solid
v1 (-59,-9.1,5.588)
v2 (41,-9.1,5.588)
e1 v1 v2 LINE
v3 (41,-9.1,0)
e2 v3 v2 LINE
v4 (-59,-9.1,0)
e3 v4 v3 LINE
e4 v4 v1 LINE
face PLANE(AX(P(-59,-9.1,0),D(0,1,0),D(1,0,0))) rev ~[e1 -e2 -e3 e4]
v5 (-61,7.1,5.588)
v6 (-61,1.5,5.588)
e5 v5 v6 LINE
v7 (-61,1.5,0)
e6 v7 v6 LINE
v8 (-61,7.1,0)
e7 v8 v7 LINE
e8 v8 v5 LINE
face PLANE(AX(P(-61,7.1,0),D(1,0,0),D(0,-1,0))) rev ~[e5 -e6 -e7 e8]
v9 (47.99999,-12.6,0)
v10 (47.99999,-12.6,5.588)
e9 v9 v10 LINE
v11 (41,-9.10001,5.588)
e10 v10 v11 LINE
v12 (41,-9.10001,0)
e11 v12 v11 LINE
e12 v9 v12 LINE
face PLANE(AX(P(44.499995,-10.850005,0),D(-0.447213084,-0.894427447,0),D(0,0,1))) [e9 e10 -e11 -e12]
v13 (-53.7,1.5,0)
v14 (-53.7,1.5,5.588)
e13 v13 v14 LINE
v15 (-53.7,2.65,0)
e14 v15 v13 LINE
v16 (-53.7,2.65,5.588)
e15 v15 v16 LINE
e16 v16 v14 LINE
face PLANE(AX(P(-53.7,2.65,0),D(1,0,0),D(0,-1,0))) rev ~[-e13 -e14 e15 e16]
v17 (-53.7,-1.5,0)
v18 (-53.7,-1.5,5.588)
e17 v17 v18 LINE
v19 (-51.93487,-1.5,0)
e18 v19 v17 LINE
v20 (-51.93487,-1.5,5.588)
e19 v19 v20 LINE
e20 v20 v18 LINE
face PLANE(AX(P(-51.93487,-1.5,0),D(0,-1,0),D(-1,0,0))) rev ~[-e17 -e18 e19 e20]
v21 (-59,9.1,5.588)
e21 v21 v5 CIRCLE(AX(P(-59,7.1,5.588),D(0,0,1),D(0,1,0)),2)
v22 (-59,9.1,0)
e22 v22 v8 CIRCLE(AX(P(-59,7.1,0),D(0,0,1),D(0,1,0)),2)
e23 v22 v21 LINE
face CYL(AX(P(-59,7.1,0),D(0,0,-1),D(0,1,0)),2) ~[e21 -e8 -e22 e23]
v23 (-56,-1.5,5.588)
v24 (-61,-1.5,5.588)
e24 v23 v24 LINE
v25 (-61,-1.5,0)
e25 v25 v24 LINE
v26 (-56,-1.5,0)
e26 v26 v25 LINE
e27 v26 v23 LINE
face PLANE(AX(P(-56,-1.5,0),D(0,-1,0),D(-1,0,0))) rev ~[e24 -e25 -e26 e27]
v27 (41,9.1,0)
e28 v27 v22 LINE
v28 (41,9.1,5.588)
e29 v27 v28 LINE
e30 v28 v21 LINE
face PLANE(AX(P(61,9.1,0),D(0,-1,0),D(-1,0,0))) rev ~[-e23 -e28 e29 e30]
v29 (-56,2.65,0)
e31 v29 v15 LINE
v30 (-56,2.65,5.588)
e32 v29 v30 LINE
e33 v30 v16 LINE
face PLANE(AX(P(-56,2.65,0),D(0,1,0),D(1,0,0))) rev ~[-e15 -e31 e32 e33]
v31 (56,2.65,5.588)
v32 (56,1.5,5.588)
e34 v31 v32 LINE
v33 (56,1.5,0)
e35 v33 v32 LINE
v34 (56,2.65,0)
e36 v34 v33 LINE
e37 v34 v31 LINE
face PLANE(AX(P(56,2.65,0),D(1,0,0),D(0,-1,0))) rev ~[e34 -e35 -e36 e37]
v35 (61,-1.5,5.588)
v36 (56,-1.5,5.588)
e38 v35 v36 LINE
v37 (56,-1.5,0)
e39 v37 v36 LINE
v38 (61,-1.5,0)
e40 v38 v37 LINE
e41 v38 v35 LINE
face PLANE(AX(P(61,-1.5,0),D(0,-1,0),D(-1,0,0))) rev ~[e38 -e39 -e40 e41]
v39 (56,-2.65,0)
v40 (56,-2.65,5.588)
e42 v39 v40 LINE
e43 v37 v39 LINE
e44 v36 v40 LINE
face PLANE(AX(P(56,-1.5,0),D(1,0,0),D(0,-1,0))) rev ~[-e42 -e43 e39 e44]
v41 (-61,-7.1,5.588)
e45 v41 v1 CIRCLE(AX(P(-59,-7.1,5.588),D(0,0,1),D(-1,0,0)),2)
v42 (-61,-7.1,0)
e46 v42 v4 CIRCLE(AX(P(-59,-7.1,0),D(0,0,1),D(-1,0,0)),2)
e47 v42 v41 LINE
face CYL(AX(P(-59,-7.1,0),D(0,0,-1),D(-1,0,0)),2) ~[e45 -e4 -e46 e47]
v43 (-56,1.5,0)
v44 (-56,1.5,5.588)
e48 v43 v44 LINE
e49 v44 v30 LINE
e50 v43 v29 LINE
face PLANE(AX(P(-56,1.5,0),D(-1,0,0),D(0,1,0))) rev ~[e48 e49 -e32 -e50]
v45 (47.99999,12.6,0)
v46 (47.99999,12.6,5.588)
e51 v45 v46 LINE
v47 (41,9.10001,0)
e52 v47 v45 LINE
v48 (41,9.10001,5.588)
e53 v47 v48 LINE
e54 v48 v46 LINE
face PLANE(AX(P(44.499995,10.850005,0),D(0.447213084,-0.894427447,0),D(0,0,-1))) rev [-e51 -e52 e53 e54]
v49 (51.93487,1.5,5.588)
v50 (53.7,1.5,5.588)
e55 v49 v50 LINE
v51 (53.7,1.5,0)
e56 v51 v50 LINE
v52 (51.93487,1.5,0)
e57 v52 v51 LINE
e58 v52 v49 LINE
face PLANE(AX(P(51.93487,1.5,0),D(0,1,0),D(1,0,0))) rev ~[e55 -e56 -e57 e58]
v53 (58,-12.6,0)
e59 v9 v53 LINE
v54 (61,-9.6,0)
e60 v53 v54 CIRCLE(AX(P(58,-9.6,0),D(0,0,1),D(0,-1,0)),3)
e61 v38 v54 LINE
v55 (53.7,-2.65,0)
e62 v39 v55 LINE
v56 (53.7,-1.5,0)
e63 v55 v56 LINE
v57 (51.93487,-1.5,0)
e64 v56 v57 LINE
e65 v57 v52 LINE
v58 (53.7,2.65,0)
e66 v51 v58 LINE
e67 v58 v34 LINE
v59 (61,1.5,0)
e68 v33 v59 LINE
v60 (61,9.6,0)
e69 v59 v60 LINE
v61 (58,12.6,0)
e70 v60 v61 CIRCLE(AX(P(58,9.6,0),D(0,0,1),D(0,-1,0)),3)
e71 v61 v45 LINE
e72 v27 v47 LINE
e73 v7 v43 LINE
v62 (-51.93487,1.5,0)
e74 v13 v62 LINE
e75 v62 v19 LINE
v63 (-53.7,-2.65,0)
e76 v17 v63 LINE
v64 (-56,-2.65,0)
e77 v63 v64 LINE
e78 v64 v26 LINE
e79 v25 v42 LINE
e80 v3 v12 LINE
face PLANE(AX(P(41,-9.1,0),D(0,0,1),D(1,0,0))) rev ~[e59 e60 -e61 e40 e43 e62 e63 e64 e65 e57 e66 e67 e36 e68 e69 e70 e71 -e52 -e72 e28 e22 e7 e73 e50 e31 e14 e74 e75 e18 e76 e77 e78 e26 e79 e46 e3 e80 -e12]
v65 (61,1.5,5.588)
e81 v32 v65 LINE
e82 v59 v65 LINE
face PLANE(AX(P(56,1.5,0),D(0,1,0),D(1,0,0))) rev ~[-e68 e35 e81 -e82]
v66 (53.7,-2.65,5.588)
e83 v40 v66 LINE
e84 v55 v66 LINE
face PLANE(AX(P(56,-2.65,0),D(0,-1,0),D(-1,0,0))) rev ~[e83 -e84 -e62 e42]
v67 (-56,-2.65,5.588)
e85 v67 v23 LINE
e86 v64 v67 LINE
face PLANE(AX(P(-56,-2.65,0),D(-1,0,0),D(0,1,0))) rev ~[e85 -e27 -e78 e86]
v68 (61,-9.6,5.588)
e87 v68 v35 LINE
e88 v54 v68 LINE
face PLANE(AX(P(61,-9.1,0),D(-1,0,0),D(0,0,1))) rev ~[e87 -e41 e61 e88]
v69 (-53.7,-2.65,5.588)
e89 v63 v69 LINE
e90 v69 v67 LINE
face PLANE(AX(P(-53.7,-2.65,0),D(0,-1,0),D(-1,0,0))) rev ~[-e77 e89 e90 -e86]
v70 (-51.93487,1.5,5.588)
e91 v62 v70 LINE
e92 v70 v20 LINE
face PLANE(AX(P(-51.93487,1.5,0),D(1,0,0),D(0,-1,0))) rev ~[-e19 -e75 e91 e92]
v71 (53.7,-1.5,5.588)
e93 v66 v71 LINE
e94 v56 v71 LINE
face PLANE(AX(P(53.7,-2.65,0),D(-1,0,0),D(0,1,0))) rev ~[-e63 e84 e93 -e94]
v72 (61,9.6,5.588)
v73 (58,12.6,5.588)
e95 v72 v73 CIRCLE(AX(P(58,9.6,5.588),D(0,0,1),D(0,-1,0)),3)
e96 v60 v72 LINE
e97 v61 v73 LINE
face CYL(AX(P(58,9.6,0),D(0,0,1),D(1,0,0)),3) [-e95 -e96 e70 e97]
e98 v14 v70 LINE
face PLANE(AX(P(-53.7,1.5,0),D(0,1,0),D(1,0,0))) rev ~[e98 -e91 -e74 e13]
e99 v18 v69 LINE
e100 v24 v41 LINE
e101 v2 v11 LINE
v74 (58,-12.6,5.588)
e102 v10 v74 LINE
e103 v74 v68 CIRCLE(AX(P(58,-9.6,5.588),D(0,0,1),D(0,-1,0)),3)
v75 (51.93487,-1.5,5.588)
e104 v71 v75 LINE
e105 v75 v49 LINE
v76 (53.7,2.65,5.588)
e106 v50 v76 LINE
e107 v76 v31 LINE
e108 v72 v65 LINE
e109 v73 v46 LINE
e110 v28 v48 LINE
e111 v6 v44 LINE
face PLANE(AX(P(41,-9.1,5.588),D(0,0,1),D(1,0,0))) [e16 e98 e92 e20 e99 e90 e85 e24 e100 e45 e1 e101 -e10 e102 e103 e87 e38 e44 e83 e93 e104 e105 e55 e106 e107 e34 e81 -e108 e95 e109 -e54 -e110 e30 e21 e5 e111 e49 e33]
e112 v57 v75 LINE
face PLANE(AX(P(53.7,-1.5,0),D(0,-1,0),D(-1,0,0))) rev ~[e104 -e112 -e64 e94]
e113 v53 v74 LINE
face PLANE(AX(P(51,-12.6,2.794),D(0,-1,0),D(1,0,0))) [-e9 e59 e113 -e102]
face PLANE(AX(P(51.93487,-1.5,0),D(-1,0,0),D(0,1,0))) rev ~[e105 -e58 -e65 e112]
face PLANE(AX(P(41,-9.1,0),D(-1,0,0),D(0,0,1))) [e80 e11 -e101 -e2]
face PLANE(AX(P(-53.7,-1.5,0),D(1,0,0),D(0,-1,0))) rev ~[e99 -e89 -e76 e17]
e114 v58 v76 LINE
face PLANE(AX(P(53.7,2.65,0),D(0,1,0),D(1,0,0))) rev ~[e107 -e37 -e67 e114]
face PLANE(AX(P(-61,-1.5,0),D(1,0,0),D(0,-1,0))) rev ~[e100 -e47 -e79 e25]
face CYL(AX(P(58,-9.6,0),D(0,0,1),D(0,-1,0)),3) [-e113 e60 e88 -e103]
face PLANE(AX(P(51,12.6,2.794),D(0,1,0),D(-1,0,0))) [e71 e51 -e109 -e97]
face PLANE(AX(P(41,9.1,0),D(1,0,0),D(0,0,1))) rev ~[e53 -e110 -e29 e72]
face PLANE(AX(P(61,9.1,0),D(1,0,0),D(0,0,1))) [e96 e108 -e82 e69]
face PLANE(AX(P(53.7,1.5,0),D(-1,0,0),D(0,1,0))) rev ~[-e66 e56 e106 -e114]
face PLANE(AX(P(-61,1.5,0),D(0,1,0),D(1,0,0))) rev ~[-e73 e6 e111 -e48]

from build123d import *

# Parameters (mm, degrees)
F1_DEPTH = 5.588
F2_W     = 20
F2_H     = 5.588
F3_DEPTH = 3.5
F4_SIZE2 = 6.99999
F4_SIZE  = 3.49999
F5_W     = 20
F5_H     = 5.588
F6_DEPTH = 3.5
F7_SIZE2 = 3.49999
F7_SIZE  = 6.99999
F8_R     = 3


# Not quite as in the source:
# - a fillet or chamfer is up to 0.001 mm smaller than in the source, because OpenCascade refuses the exact size


with BuildPart() as f1:
    # F0 (on Top) → F1 (new body)
    with BuildSketch(Plane.XY):
        with BuildLine():
            Line((61, 9.1), (-59, 9.1))
            ThreePointArc((-59, 9.1), (-60.4142135624, 8.5142135624), (-61, 7.1))
            Line((-61, 7.1), (-61, 1.5))
            Line((-61, 1.5), (-56, 1.5))
            Line((-56, 1.5), (-56, 2.65))
            Line((-56, 2.65), (-53.7, 2.65))
            Line((-53.7, 2.65), (-53.7, 1.5))
            Line((-53.7, 1.5), (-51.934869796, 1.5))
            Line((-51.934869796, 1.5), (-51.934869796, -1.5))
            Line((-51.934869796, -1.5), (-53.7, -1.5))
            Line((-53.7, -1.5), (-53.7, -2.65))
            Line((-53.7, -2.65), (-56, -2.65))
            Line((-56, -2.65), (-56, -1.5))
            Line((-56, -1.5), (-61, -1.5))
            Line((-61, -1.5), (-61, -7.1))
            ThreePointArc((-61, -7.1), (-60.4142135624, -8.5142135624), (-59, -9.1))
            Line((-59, -9.1), (61, -9.1))
            Line((61, -9.1), (61, -7.1))
            Line((61, -7.1), (61, -1.5))
            Line((61, -1.5), (56, -1.5))
            Line((56, -1.5), (56, -2.65))
            Line((56, -2.65), (53.7, -2.65))
            Line((53.7, -2.65), (53.7, -1.5))
            Line((53.7, -1.5), (51.934869796, -1.5))
            Line((51.934869796, -1.5), (51.934869796, 1.5))
            Line((51.934869796, 1.5), (53.7, 1.5))
            Line((53.7, 1.5), (53.7, 2.65))
            Line((53.7, 2.65), (56, 2.65))
            Line((56, 2.65), (56, 1.5))
            Line((56, 1.5), (61, 1.5))
            Line((61, 1.5), (61, 7.1))
            Line((61, 7.1), (61, 9.1))
        make_face()
    extrude(amount=F1_DEPTH)

    # F2 (on face) → F3 (join)
    with BuildSketch(Plane(origin=(0, 9.1, 0), x_dir=(-1, 0, 0), z_dir=(0, 1, 0))):
        with Locations((-51, 2.794)):
            Rectangle(F2_W, F2_H)
    extrude(amount=F3_DEPTH)

    # F4 (size 3.5 and 7 in the source; OpenCascade refuses exactly that, so slightly less here)
    f4_edges = [f1.edges().sort_by_distance(p)[0] for p in [
        (41, 12.6, 2.794),
    ]]
    f4_side = f1.faces().sort_by_distance((41, 10.85, 2.794))[0]
    chamfer(f4_edges, length=F4_SIZE, length2=F4_SIZE2, reference=f4_side)

    # F5 (on face) → F6 (join)
    with BuildSketch(Plane.XZ.offset(9.1)):
        with Locations((51, 2.794)):
            Rectangle(F5_W, F5_H)
    extrude(amount=F6_DEPTH)

    # F7 (size 7 and 3.5 in the source; OpenCascade refuses exactly that, so slightly less here)
    f7_edges = [f1.edges().sort_by_distance(p)[0] for p in [
        (41, -12.6, 2.794),
    ]]
    f7_side = f1.faces().sort_by_distance((51, -12.6, 2.794))[0]
    chamfer(f7_edges, length=F7_SIZE, length2=F7_SIZE2, reference=f7_side)

    # F8
    f8_edges = [f1.edges().sort_by_distance(p)[0] for p in [
        (61, 12.6, 2.794),
        (61, -12.6, 2.794),
    ]]
    fillet(f8_edges, radius=F8_R)


solid = f1.part
